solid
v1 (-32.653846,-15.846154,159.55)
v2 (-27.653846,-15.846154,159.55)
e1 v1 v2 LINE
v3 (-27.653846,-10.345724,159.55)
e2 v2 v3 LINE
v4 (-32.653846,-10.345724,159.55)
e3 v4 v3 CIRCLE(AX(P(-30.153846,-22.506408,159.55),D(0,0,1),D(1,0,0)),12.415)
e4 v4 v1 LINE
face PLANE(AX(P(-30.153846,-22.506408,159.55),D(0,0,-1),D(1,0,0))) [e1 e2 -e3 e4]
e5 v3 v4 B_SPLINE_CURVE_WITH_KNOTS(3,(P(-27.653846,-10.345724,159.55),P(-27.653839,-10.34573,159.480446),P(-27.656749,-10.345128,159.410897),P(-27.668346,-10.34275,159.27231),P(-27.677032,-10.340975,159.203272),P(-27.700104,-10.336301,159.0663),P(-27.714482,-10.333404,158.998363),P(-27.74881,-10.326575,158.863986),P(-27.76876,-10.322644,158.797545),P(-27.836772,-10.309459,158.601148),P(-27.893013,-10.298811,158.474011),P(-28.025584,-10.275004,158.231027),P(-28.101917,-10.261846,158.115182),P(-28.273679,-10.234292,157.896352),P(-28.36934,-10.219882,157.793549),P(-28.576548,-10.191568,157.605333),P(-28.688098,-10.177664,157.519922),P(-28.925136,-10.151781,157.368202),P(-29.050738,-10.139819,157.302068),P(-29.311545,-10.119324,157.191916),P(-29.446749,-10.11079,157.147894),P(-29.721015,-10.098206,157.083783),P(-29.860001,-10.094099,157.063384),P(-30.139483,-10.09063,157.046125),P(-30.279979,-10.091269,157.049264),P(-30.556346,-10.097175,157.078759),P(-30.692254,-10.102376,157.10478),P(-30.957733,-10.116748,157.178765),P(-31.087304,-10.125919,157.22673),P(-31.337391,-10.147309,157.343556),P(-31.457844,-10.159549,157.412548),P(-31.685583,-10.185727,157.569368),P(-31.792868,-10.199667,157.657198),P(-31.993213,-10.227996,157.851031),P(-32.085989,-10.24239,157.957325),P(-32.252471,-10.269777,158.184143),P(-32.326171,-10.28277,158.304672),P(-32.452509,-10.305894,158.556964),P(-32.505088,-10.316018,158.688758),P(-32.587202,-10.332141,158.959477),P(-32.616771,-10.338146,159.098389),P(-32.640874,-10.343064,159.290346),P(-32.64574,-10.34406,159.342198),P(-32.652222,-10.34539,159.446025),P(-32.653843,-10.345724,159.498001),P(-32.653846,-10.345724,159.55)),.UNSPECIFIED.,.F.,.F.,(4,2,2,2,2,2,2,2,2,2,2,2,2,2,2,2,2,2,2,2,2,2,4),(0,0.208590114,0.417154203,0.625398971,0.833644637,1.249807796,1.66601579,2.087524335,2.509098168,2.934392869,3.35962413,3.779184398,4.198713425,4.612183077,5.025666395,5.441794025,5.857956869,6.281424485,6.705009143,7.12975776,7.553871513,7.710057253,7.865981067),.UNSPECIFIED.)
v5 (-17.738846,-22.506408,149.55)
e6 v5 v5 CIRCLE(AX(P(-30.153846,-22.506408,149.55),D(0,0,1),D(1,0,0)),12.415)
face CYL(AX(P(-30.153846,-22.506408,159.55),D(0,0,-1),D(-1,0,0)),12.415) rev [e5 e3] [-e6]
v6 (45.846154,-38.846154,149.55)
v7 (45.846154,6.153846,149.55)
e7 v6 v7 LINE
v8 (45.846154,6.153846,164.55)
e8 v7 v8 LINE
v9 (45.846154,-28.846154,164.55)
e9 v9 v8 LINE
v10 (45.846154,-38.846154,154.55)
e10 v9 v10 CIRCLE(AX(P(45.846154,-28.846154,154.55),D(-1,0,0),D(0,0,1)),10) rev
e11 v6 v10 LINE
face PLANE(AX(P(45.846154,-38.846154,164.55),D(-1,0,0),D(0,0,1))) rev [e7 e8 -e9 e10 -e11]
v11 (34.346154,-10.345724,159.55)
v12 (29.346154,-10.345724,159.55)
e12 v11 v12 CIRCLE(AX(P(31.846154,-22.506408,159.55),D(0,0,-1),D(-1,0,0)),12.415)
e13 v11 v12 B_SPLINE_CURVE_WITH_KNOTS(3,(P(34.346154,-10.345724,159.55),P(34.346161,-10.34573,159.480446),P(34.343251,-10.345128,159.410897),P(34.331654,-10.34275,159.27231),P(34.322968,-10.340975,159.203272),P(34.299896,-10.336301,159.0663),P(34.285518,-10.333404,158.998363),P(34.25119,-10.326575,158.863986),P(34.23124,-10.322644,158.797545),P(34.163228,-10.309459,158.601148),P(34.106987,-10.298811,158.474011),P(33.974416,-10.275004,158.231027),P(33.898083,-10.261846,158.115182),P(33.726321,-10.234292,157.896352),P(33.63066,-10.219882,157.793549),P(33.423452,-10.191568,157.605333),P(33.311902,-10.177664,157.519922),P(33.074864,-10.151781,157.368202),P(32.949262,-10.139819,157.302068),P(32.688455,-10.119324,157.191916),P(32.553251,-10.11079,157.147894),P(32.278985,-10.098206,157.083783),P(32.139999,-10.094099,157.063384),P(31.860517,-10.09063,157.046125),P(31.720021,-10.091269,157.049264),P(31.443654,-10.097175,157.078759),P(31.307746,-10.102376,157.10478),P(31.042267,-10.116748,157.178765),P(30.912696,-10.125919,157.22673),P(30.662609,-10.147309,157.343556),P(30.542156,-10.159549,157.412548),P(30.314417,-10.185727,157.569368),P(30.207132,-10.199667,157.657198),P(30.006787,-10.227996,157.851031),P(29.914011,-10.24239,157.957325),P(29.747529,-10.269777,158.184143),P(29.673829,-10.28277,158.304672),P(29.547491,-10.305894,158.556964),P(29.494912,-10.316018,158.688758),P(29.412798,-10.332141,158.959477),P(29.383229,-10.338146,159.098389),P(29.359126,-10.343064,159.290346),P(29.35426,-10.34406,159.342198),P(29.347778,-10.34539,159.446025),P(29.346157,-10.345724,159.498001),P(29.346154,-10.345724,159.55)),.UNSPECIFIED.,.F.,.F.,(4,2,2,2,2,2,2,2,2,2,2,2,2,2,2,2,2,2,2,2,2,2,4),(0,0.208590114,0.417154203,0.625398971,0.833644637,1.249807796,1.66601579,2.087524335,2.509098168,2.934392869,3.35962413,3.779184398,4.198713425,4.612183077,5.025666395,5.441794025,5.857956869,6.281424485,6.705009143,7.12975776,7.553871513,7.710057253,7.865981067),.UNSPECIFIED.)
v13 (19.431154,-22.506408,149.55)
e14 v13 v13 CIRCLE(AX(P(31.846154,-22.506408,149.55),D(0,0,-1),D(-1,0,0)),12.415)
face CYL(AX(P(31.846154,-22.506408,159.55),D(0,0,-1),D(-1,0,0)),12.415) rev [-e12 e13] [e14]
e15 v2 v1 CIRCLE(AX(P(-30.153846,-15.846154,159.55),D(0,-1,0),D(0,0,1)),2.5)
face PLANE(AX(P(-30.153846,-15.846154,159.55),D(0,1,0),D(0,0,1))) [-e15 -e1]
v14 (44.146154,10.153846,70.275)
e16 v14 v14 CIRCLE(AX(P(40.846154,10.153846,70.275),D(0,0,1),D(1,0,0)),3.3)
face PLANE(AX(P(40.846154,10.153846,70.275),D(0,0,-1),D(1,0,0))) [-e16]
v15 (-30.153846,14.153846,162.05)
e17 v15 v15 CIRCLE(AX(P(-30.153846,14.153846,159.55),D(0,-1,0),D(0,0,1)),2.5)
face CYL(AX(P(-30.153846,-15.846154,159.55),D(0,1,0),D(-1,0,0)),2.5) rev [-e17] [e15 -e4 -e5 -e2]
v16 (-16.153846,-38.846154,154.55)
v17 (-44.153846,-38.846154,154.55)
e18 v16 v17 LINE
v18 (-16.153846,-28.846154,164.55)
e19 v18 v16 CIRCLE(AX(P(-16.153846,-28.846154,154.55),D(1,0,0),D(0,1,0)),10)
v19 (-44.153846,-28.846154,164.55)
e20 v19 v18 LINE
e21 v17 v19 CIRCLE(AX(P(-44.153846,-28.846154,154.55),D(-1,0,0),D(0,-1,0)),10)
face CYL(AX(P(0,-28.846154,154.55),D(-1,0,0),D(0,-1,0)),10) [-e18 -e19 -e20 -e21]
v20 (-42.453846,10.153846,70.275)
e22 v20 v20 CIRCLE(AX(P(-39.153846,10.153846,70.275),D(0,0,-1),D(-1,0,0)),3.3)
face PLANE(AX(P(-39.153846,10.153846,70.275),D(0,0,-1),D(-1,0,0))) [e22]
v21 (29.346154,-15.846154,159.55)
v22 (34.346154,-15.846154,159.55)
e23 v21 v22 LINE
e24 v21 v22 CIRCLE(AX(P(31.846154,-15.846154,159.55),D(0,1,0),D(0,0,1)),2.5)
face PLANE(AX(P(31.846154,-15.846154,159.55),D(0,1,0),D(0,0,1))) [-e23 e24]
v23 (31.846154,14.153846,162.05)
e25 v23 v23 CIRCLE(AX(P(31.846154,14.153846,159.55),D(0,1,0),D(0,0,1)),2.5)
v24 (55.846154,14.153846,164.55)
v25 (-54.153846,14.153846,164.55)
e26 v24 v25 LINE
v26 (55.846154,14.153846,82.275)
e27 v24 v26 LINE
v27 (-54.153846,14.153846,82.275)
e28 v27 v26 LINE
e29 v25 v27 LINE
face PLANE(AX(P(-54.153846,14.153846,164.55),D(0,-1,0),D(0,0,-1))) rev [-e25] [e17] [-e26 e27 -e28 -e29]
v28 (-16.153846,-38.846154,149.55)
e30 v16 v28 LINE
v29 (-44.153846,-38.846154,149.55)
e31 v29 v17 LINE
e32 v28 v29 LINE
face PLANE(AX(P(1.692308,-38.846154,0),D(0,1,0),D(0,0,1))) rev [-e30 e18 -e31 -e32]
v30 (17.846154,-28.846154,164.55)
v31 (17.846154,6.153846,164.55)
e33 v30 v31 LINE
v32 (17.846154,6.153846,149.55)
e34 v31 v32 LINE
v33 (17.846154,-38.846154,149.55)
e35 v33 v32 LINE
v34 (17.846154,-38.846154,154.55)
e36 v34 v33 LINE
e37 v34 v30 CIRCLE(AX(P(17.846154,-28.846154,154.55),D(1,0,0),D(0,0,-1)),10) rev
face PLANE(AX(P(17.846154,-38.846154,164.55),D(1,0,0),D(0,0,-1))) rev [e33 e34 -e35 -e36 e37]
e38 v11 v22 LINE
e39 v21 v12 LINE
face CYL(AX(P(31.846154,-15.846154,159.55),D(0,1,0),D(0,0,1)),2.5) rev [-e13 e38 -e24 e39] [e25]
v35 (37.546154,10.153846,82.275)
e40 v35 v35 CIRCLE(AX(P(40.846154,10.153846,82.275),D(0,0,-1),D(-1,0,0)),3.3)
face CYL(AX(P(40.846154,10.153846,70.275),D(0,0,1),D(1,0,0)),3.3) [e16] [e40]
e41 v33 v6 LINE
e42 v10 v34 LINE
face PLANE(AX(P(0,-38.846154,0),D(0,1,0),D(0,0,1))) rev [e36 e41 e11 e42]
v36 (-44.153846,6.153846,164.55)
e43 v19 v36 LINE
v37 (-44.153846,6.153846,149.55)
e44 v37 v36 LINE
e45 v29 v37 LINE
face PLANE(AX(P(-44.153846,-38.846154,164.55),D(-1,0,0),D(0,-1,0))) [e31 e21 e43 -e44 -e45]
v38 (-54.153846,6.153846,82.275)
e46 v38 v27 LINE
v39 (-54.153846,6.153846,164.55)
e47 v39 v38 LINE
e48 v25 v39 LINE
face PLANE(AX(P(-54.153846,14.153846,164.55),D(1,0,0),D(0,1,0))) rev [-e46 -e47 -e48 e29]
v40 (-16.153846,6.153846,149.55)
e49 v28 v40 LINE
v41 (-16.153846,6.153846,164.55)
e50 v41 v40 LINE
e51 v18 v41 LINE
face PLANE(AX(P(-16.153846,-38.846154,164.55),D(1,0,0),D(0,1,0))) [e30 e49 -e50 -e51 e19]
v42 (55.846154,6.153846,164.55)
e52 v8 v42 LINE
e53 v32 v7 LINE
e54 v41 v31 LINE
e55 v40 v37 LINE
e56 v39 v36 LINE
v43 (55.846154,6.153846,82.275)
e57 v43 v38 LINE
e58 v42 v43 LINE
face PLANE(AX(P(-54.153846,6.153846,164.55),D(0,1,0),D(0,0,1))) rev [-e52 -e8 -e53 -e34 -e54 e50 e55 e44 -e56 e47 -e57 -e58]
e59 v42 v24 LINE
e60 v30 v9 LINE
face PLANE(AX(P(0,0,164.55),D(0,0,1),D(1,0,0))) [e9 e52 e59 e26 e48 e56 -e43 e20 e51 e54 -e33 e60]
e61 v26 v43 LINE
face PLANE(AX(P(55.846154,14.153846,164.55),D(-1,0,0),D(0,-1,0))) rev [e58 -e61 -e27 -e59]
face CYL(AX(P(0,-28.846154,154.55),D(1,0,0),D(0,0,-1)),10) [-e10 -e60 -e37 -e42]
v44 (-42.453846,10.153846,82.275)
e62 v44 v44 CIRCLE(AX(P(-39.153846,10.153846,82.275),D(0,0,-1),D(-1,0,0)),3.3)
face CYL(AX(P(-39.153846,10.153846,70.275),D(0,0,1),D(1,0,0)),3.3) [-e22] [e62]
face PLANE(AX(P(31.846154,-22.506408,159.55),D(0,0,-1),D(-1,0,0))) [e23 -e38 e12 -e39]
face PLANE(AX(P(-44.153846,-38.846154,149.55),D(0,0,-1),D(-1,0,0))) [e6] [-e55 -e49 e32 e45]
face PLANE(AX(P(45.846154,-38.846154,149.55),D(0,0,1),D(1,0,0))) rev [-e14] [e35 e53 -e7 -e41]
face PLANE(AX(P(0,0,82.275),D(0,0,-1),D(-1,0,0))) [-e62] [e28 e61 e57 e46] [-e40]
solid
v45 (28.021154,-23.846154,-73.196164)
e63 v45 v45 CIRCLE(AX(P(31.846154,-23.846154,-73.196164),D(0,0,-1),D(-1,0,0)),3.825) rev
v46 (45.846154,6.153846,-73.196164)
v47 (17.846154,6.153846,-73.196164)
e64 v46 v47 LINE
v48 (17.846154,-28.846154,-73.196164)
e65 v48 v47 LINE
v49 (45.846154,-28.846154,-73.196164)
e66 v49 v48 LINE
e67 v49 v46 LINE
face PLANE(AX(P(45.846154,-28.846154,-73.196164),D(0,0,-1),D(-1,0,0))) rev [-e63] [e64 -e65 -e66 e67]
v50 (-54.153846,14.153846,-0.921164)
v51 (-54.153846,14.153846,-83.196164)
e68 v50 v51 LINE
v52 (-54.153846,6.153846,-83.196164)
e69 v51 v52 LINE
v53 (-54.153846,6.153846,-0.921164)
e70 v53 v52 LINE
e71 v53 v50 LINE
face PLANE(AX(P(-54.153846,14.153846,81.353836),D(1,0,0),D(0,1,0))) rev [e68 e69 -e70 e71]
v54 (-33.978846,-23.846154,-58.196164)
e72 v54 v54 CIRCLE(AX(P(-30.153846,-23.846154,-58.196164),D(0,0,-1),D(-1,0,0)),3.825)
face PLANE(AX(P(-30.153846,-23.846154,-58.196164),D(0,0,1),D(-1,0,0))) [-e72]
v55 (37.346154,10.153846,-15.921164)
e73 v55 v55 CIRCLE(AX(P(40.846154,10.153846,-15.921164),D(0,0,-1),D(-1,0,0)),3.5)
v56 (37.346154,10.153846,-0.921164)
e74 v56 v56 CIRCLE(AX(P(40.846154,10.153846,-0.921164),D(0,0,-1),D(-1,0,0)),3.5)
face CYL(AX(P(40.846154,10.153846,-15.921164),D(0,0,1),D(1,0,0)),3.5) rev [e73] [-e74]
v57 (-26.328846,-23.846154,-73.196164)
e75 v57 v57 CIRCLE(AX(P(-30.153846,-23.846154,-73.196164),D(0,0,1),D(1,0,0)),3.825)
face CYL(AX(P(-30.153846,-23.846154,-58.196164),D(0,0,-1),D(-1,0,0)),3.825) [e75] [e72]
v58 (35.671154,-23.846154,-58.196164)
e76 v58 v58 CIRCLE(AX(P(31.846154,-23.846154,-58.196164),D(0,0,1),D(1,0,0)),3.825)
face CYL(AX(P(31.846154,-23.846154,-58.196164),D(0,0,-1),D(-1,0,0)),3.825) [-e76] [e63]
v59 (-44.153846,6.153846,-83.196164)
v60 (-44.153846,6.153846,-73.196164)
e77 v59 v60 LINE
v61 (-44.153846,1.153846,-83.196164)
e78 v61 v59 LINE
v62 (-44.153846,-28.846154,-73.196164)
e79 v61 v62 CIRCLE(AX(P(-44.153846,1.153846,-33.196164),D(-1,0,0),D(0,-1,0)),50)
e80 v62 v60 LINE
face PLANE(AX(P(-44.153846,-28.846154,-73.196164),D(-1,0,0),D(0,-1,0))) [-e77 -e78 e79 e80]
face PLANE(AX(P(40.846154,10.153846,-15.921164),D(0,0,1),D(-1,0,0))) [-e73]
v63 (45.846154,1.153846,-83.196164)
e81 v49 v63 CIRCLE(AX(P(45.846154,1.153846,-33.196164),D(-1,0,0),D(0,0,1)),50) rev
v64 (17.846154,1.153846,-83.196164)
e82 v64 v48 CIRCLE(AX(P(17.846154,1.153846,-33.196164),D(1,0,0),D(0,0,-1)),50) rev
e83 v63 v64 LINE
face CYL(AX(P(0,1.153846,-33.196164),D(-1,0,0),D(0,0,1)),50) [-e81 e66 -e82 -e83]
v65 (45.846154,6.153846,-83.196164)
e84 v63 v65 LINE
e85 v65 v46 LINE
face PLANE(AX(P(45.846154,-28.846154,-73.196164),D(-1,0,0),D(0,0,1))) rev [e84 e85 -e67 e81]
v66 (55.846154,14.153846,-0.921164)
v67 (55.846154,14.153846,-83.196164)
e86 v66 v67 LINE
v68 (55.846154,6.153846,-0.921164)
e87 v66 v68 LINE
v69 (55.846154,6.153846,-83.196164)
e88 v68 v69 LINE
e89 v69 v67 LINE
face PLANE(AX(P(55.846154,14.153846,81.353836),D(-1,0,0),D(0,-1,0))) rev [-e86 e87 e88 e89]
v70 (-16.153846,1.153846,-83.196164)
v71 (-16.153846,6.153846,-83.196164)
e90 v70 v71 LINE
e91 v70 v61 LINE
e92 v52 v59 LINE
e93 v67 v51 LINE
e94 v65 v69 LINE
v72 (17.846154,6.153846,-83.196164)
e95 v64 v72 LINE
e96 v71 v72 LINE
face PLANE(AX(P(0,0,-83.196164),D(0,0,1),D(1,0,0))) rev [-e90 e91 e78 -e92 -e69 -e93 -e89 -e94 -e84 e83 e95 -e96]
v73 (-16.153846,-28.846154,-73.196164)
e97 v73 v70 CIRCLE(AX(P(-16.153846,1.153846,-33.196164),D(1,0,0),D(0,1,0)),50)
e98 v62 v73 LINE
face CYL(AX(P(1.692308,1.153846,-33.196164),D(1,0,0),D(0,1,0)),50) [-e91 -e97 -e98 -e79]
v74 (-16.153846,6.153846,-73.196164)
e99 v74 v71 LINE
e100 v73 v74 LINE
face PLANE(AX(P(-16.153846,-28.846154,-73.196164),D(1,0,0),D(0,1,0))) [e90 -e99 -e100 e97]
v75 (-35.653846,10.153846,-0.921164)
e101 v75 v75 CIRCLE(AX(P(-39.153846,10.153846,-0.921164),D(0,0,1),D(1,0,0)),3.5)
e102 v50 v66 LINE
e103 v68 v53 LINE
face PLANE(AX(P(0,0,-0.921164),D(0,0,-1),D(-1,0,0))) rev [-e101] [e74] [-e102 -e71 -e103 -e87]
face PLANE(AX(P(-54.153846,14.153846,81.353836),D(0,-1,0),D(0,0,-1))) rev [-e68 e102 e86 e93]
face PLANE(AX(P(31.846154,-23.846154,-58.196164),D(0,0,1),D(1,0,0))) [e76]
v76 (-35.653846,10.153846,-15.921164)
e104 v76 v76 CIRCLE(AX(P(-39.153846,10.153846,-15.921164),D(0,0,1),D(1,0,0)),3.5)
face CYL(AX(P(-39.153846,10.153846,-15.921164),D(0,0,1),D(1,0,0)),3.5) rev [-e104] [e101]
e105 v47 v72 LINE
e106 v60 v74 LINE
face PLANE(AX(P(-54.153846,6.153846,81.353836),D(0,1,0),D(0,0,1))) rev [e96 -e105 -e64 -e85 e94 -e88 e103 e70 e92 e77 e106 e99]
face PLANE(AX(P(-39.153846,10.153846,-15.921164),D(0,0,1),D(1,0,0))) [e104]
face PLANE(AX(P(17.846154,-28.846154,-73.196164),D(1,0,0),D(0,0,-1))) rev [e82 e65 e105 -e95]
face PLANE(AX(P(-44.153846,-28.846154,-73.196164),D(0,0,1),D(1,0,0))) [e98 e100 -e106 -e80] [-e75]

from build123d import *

# Parameters (mm, degrees)
SKETCH_1_W             = 110
SKETCH_1_H             = 8
EXTRUDE_1_DEPTH        = 164.55
SKETCH_7_W             = 28
SKETCH_7_H             = 15
EXTRUDE_2_DEPTH        = 45
FILLET_1_R             = 10
SKETCH_10_R            = 12.415
CUT_EXTRUDE_3_DEPTH    = 10
SKETCH_11_R            = 2.5
CUT_EXTRUDE_4_DEPTH    = 30
FILLET_1_OF_MIRROR_1_R = 10
SKETCH_13_W            = 28
SKETCH_13_H            = 10
EXTRUDE_3_DEPTH        = 35
FILLET_2_R             = 50
SKETCH_14_R            = 3.825
EXTRUDE_4_DEPTH        = 15
MIRROR_START           = -44.153846154
MIRROR_2_DEPTH         = 28
MIRROR_START_2         = 10
MIRROR_2_2_OUTLINE_R   = 3.825
MIRROR_2_2_DEPTH       = 15
SKETCH5_R              = 3.5
CUT_EXTRUDE2_DEPTH     = 15
SKETCH6_R              = 3.3
BOSS_EXTRUDE1_DEPTH    = 12


with BuildPart() as part:
    # Эскиз1 → Бобышка-Вытянуть1 (new body)
    with BuildSketch(Plane.XY):
        with Locations((0.846153846, 10.153846154)):
            Rectangle(SKETCH_1_W, SKETCH_1_H)
    extrude(amount=EXTRUDE_1_DEPTH)

    # Эскиз7 → Бобышка-Вытянуть2 (add)
    with BuildSketch(Plane.XZ.offset(-6.153846154)):
        with Locations((31.846153846, 157.05)):
            Rectangle(SKETCH_7_W, SKETCH_7_H)
    extrude_2 = extrude(amount=EXTRUDE_2_DEPTH)

    # Скругление1
    fillet_1_edges = [part.edges().sort_by_distance(p)[0] for p in [
        (31.846153846, -38.846153846, 164.55),
    ]]
    fillet(fillet_1_edges, radius=FILLET_1_R)

    # Эскиз10 → Вырез-Вытянуть3 (cut)
    with BuildSketch(Plane(origin=(0, 0, 149.55), x_dir=(-1, 0, 0), z_dir=(0, 0, -1))):
        with Locations((-31.846153846, -22.506407884)):
            Circle(SKETCH_10_R)
    cut_extrude_3 = extrude(amount=-CUT_EXTRUDE_3_DEPTH, mode=Mode.SUBTRACT)

    # Эскиз11 → Вырез-Вытянуть4 (cut)
    with BuildSketch(Plane(origin=(0, 14.153846154, 0), x_dir=(1, 0, 0), z_dir=(0, 1, 0))):
        with Locations(Location((31.846153846, -159.55, 0), (0, 0, 270))):
            Circle(SKETCH_11_R)
    cut_extrude_4 = extrude(amount=-CUT_EXTRUDE_4_DEPTH, mode=Mode.SUBTRACT)

    # Зеркальное отражение1: Бобышка-Вытянуть2, Вырез-Вытянуть3, Вырез-Вытянуть4 across plane
    add(extrude_2.mirror(Plane.ZY.offset(-0.846153846)))
    add(cut_extrude_3.mirror(Plane.ZY.offset(-0.846153846)), mode=Mode.SUBTRACT)
    add(cut_extrude_4.mirror(Plane.ZY.offset(-0.846153846)), mode=Mode.SUBTRACT)

    # Скругление1 of Зеркальное отражение1
    fillet_1_of_mirror_1_edges = [part.edges().sort_by_distance(p)[0] for p in [
        (-30.153846154, -38.846153846, 164.55),
    ]]
    fillet(fillet_1_of_mirror_1_edges, radius=FILLET_1_OF_MIRROR_1_R)

    # Эскиз13 → Бобышка-Вытянуть3 (add)
    with BuildSketch(Plane(origin=(0, 6.153846154, 0), x_dir=(-1, 0, 0), z_dir=(0, -1, 0))):
        with Locations((-31.846153846, -5)):
            Rectangle(SKETCH_13_W, SKETCH_13_H)
    extrude(amount=EXTRUDE_3_DEPTH)

    # Скругление2
    # the kernel refuses this fillet: 50 mm, written as the material it takes off along each edge
    with BuildSketch(Plane(origin=(-57.153846154, -28.846153846, 0), x_dir=(0, 1, 0), z_dir=(1, 0, 0))) as fillet_2_piece_1:
        with BuildLine():
            CenterArc((30, 50), FILLET_2_R, 233.130102354, 36.869897646)
            Line((0, 10), (0, 0))
            Line((0, 0), (30, 0))
        make_face()
    extrude(amount=178, mode=Mode.SUBTRACT)

    # Эскиз14 → Бобышка-Вытянуть4 (add)
    with BuildSketch(Plane.XY.offset(10)):
        with Locations(Location((31.846153846, -23.846153846, 0), (0, 0, 180))):
            Circle(SKETCH_14_R)
    extrude(amount=EXTRUDE_4_DEPTH)

    # Зеркальное отражение2: read off the stored shape, not the designer's step
    # Зеркальное отражение2 outline → Зеркальное отражение2 (add)
    with BuildSketch(Plane.YZ.offset(MIRROR_START)):
        with BuildLine():
            Line((1.153846154, 0), (6.153846154, 0))
            Line((6.153846154, 0), (6.153846154, 10))
            Line((6.153846154, 10), (-28.846153846, 10))
            ThreePointArc((-28.846153846, 10), (-14.657542147, 2.565835097), (1.153846154, 0))
        make_face()
    extrude(amount=MIRROR_2_DEPTH)

    # Mirror 2 2 outline → Mirror 2 2 (add)
    with BuildSketch(Plane.XY.offset(MIRROR_START_2)):
        with Locations((-30.153846154, -23.846153846)):
            Circle(MIRROR_2_2_OUTLINE_R)
    extrude(amount=MIRROR_2_2_DEPTH)


with BuildPart() as body_2:
    # Split1: the piece on the far side of the plane
    add(part.part)
    split(bisect_by=Plane(origin=(0, 0, 82.275), x_dir=(-1, 0, 0), z_dir=(0, 0, -1)), keep=Keep.BOTTOM)

    # Sketch6 → Boss-Extrude1 (add)
    with BuildSketch(Plane(origin=(0, 0, 82.275), x_dir=(-1, 0, 0), z_dir=(0, 0, -1))):
        with Locations((39.153846154, 10.153846154)):
            Circle(SKETCH6_R)
    boss_extrude1 = extrude(amount=BOSS_EXTRUDE1_DEPTH)

    # Mirror2: Boss-Extrude1 across plane
    add(boss_extrude1.mirror(Plane.ZY.offset(-0.846153846)))


with BuildPart() as part_1:
    add(part.part)

    # Split1
    split(bisect_by=Plane(origin=(0, 0, 82.275), x_dir=(-1, 0, 0), z_dir=(0, 0, -1)), keep=Keep.TOP)


with BuildPart() as part_2:
    # Body-Move/Copy1: moved
    add(part_1.part.moved(Location((0, 0, -83.19616445))))

    # Sketch5 → Cut-Extrude2 (cut)
    with BuildSketch(Plane.XY.offset(-0.92116445)):
        with Locations((-39.153846154, 10.153846154)):
            Circle(SKETCH5_R)
    cut_extrude2 = extrude(amount=-CUT_EXTRUDE2_DEPTH, mode=Mode.SUBTRACT)

    # Mirror1: Cut-Extrude2 across plane
    add(cut_extrude2.mirror(Plane.ZY.offset(-0.846153846)), mode=Mode.SUBTRACT)


solid = Compound([body_2.part, part_2.part])
